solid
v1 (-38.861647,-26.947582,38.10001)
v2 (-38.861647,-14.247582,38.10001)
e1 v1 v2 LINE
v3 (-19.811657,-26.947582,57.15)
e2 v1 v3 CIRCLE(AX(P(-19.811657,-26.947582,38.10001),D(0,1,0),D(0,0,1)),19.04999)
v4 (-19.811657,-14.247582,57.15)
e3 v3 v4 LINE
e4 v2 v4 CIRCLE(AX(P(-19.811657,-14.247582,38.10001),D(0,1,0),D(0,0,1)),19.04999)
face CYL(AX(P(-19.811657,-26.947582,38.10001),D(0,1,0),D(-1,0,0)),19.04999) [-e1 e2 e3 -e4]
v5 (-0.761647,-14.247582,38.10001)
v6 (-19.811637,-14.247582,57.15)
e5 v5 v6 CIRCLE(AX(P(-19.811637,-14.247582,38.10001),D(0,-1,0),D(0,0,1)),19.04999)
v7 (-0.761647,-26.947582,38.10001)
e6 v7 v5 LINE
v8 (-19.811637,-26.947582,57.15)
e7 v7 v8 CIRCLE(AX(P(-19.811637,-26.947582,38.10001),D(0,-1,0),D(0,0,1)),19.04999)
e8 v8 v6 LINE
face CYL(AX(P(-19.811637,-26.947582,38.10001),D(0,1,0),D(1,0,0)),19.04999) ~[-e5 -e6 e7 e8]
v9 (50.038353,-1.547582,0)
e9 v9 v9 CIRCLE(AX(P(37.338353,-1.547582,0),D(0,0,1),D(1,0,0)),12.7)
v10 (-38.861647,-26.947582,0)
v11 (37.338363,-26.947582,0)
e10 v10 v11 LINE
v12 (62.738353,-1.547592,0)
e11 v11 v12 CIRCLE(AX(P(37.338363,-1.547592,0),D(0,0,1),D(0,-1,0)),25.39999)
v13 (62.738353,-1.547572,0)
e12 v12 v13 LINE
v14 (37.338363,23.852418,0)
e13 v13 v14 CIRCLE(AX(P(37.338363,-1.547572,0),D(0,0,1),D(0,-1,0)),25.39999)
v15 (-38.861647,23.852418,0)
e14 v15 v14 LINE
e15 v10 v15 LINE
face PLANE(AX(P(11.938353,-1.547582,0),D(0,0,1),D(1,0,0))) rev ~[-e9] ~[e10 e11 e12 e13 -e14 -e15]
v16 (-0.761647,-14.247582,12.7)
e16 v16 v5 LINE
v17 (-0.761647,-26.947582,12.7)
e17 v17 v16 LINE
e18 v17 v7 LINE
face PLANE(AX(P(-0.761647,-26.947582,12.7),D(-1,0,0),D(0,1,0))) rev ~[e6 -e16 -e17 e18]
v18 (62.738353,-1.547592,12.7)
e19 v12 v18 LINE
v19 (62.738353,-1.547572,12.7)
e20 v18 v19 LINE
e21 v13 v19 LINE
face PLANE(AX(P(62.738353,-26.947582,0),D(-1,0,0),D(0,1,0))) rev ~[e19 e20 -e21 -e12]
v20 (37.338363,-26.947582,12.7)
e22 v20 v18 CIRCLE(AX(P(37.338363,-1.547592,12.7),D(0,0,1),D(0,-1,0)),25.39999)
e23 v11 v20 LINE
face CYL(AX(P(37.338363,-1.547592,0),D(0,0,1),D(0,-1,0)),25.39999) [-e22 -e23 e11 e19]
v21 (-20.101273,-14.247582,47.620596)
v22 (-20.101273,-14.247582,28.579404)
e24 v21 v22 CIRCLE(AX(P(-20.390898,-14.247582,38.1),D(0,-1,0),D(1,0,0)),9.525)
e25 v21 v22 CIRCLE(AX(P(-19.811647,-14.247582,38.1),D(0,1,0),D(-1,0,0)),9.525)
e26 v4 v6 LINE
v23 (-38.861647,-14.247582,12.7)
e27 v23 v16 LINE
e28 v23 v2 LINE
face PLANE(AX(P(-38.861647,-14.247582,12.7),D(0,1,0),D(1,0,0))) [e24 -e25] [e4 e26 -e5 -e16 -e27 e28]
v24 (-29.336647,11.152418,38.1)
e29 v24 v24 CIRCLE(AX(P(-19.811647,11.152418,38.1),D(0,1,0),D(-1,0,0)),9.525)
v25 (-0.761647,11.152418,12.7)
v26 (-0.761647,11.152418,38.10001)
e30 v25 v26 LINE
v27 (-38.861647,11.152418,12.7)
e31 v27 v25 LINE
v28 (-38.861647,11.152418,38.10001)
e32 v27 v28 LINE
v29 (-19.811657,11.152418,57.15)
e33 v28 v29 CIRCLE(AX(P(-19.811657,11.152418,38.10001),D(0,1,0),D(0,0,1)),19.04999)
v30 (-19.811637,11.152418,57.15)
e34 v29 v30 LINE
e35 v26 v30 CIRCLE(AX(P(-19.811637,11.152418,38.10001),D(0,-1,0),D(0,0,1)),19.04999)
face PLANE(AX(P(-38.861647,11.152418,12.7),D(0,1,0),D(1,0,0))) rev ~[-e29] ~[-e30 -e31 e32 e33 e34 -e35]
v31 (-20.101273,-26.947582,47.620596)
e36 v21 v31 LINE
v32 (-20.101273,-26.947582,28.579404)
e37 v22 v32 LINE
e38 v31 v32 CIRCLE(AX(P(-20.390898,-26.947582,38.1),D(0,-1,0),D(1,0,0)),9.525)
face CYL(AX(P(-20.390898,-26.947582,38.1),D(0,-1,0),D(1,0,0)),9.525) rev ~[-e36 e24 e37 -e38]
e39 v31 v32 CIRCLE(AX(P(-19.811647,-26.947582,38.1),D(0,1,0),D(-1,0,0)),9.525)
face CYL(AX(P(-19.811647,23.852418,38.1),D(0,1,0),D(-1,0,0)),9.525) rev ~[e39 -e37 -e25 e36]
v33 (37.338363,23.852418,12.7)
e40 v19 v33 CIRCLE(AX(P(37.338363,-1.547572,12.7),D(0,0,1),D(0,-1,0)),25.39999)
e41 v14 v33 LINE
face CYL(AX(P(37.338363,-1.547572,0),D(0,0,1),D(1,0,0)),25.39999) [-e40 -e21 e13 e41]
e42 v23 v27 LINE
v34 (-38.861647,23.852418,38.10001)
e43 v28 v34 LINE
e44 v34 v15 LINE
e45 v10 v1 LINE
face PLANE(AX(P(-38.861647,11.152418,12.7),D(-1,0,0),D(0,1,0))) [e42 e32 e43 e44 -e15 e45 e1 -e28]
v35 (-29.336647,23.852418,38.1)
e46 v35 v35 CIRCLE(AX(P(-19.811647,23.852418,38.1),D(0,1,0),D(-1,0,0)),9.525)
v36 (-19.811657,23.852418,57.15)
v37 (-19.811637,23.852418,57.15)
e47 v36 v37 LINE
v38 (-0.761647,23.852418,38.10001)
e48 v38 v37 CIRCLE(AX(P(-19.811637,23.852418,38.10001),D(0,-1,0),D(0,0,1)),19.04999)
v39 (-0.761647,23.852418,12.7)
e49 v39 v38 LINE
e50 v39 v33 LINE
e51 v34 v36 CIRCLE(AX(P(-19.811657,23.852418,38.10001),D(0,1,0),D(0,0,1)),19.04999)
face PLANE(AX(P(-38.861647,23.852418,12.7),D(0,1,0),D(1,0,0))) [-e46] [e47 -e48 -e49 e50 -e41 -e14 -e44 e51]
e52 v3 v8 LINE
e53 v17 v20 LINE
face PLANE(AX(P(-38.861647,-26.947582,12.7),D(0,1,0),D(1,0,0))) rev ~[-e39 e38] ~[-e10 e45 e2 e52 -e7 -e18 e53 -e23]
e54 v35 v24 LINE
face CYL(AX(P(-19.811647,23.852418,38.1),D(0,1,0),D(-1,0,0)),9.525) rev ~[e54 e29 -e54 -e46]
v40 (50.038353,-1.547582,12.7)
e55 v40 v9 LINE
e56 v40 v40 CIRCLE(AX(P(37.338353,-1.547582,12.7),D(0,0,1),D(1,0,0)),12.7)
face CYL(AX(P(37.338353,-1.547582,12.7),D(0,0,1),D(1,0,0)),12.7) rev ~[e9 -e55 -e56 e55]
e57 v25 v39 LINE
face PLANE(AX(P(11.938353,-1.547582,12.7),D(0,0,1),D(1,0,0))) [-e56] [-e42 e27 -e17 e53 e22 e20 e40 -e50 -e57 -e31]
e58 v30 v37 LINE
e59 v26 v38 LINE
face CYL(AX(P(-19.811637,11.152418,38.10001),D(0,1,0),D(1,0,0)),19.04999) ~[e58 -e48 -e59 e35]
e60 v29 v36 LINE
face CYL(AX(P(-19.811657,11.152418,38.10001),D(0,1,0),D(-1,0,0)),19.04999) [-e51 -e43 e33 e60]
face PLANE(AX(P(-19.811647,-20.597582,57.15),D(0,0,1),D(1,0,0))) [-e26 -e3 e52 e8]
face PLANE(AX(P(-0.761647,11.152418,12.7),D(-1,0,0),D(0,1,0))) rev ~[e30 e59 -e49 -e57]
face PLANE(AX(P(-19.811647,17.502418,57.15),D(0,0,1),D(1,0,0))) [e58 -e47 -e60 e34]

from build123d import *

# Parameters (mm, degrees)
F0_W      = 101.6
F0_H      = 50.8
F1_DEPTH  = 12.7
F3_R      = 25.39999
F2_R      = 12.7
F4_DEPTH  = 12.701
F5_W      = 38.1
F5_H      = 12.7
F6_DEPTH  = 44.45
F7_R      = 19.04999
F8_R      = 9.525
F9_DEPTH  = 50.801
F10_W     = 38.1
F10_H     = 12.7
F11_DEPTH = 44.45
F12_R     = 19.04999
F13_R     = 9.525
F14_DEPTH = 50.801


# Not quite as in the source:
# - a fillet or chamfer is up to 0.001 mm smaller than in the source, because OpenCascade refuses the exact size


with BuildPart() as f1:
    # F0 (on Top) → F1 (new body)
    with BuildSketch(Plane.XY):
        with Locations((11.9383526917, -1.5475824475)):
            Rectangle(F0_W, F0_H)
    extrude(amount=F1_DEPTH)

    # F3 (radius 25.4 in the source; OpenCascade refuses exactly that, so slightly less here)
    f3_edges = [f1.edges().sort_by_distance(p)[0] for p in [
        (62.738353, -26.947582, 6.35),
        (62.738353, 23.852418, 6.35),
    ]]
    fillet(f3_edges, radius=F3_R)

    # F2 (on face) → F4 (cut, through all)
    with BuildSketch(Plane.XY.offset(12.7)):
        with Locations((37.3383526917, -1.5475824475)):
            Circle(F2_R)
    extrude(amount=-F4_DEPTH, mode=Mode.SUBTRACT)

    # F5 (on face) → F6 (join)
    with BuildSketch(Plane.XY.offset(12.7)):
        with Locations((-19.8116473083, -20.5975824475)):
            Rectangle(F5_W, F5_H)
    extrude(amount=F6_DEPTH)

    # F7 (radius 19.05 in the source; OpenCascade refuses exactly that, so slightly less here)
    f7_edges = [f1.edges().sort_by_distance(p)[0] for p in [
        (-38.861647, -20.597582, 57.15),
        (-0.761647, -20.597582, 57.15),
    ]]
    fillet(f7_edges, radius=F7_R)

    # F8 (on face) → F9 (cut, through all)
    with BuildSketch(Plane.XZ.offset(26.9475824475)):
        with Locations((-20.3908979893, 38.1)):
            Circle(F8_R)
    extrude(amount=-F9_DEPTH, mode=Mode.SUBTRACT)

    # F10 (on face) → F11 (join)
    with BuildSketch(Plane.XY.offset(12.7)):
        with Locations((-19.8116473083, 17.5024175525)):
            Rectangle(F10_W, F10_H)
    extrude(amount=F11_DEPTH)

    # F12 (radius 19.05 in the source; OpenCascade refuses exactly that, so slightly less here)
    f12_edges = [f1.edges().sort_by_distance(p)[0] for p in [
        (-0.761647, 17.502418, 57.15),
        (-38.861647, 17.502418, 57.15),
    ]]
    fillet(f12_edges, radius=F12_R)

    # F13 (on face) → F14 (cut, through all)
    with BuildSketch(Plane(origin=(0, 23.8524175525, 0), x_dir=(-1, 0, 0), z_dir=(0, 1, 0))):
        with Locations((19.8116473083, 38.1)):
            Circle(F13_R)
    extrude(amount=-F14_DEPTH, mode=Mode.SUBTRACT)


solid = f1.part
